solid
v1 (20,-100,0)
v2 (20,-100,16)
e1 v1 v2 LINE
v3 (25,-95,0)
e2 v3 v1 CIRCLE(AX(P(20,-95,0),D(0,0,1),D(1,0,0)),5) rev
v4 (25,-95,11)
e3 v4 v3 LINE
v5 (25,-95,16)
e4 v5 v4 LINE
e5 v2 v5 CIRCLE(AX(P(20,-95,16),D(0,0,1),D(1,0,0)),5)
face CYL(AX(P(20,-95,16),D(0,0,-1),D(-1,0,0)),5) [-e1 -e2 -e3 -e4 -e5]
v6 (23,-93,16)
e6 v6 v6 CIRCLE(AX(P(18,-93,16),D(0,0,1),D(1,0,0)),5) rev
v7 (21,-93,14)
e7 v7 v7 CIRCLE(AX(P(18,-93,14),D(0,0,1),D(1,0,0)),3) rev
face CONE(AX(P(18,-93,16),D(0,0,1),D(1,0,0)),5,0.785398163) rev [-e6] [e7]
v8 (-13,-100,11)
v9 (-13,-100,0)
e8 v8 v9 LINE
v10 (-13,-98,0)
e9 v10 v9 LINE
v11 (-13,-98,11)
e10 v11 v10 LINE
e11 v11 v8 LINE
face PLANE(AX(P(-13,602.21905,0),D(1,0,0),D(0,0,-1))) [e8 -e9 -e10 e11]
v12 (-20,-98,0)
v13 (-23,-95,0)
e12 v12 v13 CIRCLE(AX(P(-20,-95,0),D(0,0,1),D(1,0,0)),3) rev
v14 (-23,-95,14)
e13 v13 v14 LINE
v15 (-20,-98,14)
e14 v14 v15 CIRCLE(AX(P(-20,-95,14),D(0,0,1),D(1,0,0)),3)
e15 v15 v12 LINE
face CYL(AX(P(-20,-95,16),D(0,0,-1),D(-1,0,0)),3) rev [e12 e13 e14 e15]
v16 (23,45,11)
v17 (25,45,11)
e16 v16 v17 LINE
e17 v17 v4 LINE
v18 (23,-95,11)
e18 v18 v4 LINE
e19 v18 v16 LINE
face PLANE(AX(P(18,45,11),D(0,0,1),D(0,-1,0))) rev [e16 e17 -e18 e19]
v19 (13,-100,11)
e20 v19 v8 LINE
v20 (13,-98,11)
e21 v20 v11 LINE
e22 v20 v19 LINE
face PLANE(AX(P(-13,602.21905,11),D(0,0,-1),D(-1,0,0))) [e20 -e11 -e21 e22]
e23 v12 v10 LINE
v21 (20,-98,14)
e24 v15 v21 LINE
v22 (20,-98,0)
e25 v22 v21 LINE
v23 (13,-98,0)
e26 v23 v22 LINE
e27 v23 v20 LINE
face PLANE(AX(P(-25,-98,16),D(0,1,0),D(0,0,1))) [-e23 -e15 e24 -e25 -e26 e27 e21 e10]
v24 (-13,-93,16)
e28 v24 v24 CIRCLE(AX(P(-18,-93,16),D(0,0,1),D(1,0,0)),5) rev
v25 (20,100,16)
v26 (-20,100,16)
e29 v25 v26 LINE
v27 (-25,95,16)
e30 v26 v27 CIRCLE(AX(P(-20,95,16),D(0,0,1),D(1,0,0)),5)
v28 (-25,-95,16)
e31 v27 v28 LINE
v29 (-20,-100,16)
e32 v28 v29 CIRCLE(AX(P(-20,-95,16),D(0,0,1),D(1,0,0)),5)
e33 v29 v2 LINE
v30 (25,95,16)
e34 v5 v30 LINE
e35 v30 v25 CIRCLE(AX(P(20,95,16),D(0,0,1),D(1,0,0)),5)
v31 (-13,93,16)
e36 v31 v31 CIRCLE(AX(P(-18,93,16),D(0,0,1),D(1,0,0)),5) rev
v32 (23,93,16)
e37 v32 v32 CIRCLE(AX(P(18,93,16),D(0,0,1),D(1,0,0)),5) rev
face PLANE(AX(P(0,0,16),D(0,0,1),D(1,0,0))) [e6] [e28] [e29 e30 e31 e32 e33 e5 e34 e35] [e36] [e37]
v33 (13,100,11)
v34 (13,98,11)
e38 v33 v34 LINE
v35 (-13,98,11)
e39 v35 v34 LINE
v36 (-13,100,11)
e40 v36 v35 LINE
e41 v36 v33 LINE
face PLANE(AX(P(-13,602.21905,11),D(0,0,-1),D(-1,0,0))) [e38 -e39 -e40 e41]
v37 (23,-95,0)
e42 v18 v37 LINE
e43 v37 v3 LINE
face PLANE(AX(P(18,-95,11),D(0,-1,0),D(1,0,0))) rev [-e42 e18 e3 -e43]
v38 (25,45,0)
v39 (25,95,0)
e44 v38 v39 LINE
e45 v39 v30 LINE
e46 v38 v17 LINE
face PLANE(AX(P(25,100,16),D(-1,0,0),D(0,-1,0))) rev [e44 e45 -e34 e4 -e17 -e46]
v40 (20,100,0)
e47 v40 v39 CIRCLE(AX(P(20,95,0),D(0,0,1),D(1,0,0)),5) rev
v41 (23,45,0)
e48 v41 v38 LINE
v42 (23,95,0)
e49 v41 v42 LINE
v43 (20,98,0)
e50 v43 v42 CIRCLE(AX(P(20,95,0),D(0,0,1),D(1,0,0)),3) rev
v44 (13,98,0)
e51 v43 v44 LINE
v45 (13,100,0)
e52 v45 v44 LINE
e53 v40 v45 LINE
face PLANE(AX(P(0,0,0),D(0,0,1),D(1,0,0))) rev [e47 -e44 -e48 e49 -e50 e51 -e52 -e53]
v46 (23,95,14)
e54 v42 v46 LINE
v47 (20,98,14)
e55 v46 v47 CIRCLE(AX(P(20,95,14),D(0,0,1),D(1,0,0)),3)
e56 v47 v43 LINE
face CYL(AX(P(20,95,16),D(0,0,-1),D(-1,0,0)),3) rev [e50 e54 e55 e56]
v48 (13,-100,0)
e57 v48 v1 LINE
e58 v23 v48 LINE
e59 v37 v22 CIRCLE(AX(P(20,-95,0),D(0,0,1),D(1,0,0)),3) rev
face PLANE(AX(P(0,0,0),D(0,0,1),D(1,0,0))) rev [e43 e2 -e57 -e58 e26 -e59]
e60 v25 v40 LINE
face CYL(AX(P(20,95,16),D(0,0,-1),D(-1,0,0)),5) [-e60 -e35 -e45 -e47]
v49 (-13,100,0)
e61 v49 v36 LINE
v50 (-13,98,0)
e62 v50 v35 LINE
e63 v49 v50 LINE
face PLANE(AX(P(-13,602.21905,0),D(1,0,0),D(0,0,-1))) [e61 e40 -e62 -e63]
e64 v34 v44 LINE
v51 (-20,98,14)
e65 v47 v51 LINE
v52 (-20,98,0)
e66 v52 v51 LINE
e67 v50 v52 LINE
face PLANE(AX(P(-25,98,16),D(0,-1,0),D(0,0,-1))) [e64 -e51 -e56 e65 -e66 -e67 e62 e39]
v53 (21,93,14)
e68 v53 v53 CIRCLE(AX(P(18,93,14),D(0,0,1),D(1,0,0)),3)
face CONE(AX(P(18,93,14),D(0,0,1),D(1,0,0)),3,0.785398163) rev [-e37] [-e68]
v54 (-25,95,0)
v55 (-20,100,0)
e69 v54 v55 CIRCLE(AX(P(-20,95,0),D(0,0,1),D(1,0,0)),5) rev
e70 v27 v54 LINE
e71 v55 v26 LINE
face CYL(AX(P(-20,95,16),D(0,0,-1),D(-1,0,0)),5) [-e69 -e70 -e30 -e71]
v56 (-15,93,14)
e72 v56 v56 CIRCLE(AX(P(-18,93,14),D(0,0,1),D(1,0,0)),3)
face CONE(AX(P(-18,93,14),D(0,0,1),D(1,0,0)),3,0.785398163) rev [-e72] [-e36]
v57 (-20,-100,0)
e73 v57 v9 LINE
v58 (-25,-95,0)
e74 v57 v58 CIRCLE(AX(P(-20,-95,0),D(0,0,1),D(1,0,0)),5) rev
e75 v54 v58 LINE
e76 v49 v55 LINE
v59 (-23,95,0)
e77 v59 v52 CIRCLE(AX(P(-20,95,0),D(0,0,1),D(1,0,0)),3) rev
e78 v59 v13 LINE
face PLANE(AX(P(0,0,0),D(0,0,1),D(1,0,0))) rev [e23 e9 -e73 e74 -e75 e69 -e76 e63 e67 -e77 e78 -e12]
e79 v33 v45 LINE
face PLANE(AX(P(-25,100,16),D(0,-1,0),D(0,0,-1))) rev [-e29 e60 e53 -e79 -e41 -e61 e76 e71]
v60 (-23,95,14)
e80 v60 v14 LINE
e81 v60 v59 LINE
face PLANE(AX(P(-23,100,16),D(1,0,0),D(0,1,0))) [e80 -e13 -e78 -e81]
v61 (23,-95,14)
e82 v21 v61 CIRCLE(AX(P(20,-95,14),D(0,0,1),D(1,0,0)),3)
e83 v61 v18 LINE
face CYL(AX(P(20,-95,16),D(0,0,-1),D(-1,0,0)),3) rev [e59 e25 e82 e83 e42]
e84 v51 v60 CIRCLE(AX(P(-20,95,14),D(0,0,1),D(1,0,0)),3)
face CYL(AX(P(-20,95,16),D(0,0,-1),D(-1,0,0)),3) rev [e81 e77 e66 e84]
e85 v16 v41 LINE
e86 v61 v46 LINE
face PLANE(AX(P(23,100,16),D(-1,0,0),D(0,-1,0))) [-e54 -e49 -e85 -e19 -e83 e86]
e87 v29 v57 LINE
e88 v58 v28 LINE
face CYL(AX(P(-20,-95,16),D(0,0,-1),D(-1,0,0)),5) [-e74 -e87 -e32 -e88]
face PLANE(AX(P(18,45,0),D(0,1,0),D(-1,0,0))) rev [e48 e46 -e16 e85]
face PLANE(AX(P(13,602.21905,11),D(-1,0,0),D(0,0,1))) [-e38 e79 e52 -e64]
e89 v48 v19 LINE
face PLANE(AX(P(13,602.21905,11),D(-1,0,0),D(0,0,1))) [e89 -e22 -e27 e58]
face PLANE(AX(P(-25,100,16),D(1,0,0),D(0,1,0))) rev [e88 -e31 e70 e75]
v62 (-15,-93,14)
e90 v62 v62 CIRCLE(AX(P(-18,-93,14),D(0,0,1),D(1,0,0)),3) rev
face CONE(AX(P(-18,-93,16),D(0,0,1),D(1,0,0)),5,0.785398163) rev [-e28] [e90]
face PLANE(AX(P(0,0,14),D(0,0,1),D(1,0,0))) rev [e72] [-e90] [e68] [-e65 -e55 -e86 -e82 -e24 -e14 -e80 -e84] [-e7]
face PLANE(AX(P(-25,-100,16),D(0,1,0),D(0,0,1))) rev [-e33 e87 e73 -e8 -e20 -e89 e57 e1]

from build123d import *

# Parameters (mm, degrees)
SCHIZZO1_W                    = 50
SCHIZZO1_H                    = 200
ESTRUSIONE_ESTRUSIONE1_DEPTH  = 16
RACCORDO1_R                   = 5
SVUOTA1_T                     = -2
TAGLIO_ESTRUSIONE1_DEPTH      = 203.190504228
TAGLIO_ESTRUSIONE1_DEPTH_BACK = 203.190504228
SCHIZZO8_R                    = 3
TAGLIO_ESTRUSIONE2_DEPTH      = 105.312031904
SCHIZZO5_W                    = 11
SCHIZZO5_H                    = 140
TAGLIO_ESTRUSIONE3_DEPTH      = 7
SMUSSO1_SIZE                  = 2


with BuildPart() as part:
    # Schizzo1 → Estrusione-Estrusione1 (new body)
    with BuildSketch(Plane.XY):
        Rectangle(SCHIZZO1_W, SCHIZZO1_H)
    extrude(amount=ESTRUSIONE_ESTRUSIONE1_DEPTH)

    # Raccordo1
    raccordo1_edges = [part.edges().sort_by_distance(p)[0] for p in [
        (25, -100, 8),
        (-25, -100, 8),
        (-25, 100, 8),
        (25, 100, 8),
    ]]
    fillet(raccordo1_edges, radius=RACCORDO1_R)

    # Svuota1
    svuota1_openings = [part.faces().sort_by_distance(p)[0] for p in [
        (0, 0, 0),
    ]]
    offset(amount=SVUOTA1_T, openings=svuota1_openings, kind=Kind.INTERSECTION)

    # Schizzo4 → Taglio-Estrusione1 (cut, two sides: drawn at the far end of the back side and taken through both)
    with BuildSketch(Plane(origin=(0, 100, 0), x_dir=(1, 0, 0), z_dir=(0, 1, 0)).offset(-TAGLIO_ESTRUSIONE1_DEPTH_BACK)):
        Polygon((-13, 92.462112512), (-13, 0), (-13, -11), (13, -11), (13, 0), (13, 92.462112512), (13, 277.386337537), (-13, 277.386337537), align=None)
    extrude(amount=TAGLIO_ESTRUSIONE1_DEPTH + TAGLIO_ESTRUSIONE1_DEPTH_BACK, mode=Mode.SUBTRACT)

    # Schizzo8 → Taglio-Estrusione2 (cut, through all)
    with BuildSketch(Plane.XY.offset(16)):
        with Locations((-18, 93)):
            Circle(SCHIZZO8_R)
        with Locations((18, 93)):
            Circle(SCHIZZO8_R)
    taglio_estrusione2 = extrude(amount=-TAGLIO_ESTRUSIONE2_DEPTH, mode=Mode.SUBTRACT)

    # Specchia1: Taglio-Estrusione2 across plane
    add(taglio_estrusione2.mirror(Plane.ZX), mode=Mode.SUBTRACT)

    # Schizzo5 → Taglio-Estrusione3 (cut)
    with BuildSketch(Plane(origin=(25, 0, 0), x_dir=(0, 0, -1), z_dir=(1, 0, 0))):
        with Locations((-5.5, -25)):
            Rectangle(SCHIZZO5_W, SCHIZZO5_H)
    extrude(amount=-TAGLIO_ESTRUSIONE3_DEPTH, mode=Mode.SUBTRACT)

    # Smusso1
    smusso1_edges = [part.edges().sort_by_distance(p)[0] for p in [
        (15, -93, 16),
        (-21, 93, 16),
        (15, 93, 16),
        (-21, -93, 16),
    ]]
    chamfer(smusso1_edges, length=SMUSSO1_SIZE - 0.0001)  # a hair under: the kernel refuses the full size


solid = part.part
